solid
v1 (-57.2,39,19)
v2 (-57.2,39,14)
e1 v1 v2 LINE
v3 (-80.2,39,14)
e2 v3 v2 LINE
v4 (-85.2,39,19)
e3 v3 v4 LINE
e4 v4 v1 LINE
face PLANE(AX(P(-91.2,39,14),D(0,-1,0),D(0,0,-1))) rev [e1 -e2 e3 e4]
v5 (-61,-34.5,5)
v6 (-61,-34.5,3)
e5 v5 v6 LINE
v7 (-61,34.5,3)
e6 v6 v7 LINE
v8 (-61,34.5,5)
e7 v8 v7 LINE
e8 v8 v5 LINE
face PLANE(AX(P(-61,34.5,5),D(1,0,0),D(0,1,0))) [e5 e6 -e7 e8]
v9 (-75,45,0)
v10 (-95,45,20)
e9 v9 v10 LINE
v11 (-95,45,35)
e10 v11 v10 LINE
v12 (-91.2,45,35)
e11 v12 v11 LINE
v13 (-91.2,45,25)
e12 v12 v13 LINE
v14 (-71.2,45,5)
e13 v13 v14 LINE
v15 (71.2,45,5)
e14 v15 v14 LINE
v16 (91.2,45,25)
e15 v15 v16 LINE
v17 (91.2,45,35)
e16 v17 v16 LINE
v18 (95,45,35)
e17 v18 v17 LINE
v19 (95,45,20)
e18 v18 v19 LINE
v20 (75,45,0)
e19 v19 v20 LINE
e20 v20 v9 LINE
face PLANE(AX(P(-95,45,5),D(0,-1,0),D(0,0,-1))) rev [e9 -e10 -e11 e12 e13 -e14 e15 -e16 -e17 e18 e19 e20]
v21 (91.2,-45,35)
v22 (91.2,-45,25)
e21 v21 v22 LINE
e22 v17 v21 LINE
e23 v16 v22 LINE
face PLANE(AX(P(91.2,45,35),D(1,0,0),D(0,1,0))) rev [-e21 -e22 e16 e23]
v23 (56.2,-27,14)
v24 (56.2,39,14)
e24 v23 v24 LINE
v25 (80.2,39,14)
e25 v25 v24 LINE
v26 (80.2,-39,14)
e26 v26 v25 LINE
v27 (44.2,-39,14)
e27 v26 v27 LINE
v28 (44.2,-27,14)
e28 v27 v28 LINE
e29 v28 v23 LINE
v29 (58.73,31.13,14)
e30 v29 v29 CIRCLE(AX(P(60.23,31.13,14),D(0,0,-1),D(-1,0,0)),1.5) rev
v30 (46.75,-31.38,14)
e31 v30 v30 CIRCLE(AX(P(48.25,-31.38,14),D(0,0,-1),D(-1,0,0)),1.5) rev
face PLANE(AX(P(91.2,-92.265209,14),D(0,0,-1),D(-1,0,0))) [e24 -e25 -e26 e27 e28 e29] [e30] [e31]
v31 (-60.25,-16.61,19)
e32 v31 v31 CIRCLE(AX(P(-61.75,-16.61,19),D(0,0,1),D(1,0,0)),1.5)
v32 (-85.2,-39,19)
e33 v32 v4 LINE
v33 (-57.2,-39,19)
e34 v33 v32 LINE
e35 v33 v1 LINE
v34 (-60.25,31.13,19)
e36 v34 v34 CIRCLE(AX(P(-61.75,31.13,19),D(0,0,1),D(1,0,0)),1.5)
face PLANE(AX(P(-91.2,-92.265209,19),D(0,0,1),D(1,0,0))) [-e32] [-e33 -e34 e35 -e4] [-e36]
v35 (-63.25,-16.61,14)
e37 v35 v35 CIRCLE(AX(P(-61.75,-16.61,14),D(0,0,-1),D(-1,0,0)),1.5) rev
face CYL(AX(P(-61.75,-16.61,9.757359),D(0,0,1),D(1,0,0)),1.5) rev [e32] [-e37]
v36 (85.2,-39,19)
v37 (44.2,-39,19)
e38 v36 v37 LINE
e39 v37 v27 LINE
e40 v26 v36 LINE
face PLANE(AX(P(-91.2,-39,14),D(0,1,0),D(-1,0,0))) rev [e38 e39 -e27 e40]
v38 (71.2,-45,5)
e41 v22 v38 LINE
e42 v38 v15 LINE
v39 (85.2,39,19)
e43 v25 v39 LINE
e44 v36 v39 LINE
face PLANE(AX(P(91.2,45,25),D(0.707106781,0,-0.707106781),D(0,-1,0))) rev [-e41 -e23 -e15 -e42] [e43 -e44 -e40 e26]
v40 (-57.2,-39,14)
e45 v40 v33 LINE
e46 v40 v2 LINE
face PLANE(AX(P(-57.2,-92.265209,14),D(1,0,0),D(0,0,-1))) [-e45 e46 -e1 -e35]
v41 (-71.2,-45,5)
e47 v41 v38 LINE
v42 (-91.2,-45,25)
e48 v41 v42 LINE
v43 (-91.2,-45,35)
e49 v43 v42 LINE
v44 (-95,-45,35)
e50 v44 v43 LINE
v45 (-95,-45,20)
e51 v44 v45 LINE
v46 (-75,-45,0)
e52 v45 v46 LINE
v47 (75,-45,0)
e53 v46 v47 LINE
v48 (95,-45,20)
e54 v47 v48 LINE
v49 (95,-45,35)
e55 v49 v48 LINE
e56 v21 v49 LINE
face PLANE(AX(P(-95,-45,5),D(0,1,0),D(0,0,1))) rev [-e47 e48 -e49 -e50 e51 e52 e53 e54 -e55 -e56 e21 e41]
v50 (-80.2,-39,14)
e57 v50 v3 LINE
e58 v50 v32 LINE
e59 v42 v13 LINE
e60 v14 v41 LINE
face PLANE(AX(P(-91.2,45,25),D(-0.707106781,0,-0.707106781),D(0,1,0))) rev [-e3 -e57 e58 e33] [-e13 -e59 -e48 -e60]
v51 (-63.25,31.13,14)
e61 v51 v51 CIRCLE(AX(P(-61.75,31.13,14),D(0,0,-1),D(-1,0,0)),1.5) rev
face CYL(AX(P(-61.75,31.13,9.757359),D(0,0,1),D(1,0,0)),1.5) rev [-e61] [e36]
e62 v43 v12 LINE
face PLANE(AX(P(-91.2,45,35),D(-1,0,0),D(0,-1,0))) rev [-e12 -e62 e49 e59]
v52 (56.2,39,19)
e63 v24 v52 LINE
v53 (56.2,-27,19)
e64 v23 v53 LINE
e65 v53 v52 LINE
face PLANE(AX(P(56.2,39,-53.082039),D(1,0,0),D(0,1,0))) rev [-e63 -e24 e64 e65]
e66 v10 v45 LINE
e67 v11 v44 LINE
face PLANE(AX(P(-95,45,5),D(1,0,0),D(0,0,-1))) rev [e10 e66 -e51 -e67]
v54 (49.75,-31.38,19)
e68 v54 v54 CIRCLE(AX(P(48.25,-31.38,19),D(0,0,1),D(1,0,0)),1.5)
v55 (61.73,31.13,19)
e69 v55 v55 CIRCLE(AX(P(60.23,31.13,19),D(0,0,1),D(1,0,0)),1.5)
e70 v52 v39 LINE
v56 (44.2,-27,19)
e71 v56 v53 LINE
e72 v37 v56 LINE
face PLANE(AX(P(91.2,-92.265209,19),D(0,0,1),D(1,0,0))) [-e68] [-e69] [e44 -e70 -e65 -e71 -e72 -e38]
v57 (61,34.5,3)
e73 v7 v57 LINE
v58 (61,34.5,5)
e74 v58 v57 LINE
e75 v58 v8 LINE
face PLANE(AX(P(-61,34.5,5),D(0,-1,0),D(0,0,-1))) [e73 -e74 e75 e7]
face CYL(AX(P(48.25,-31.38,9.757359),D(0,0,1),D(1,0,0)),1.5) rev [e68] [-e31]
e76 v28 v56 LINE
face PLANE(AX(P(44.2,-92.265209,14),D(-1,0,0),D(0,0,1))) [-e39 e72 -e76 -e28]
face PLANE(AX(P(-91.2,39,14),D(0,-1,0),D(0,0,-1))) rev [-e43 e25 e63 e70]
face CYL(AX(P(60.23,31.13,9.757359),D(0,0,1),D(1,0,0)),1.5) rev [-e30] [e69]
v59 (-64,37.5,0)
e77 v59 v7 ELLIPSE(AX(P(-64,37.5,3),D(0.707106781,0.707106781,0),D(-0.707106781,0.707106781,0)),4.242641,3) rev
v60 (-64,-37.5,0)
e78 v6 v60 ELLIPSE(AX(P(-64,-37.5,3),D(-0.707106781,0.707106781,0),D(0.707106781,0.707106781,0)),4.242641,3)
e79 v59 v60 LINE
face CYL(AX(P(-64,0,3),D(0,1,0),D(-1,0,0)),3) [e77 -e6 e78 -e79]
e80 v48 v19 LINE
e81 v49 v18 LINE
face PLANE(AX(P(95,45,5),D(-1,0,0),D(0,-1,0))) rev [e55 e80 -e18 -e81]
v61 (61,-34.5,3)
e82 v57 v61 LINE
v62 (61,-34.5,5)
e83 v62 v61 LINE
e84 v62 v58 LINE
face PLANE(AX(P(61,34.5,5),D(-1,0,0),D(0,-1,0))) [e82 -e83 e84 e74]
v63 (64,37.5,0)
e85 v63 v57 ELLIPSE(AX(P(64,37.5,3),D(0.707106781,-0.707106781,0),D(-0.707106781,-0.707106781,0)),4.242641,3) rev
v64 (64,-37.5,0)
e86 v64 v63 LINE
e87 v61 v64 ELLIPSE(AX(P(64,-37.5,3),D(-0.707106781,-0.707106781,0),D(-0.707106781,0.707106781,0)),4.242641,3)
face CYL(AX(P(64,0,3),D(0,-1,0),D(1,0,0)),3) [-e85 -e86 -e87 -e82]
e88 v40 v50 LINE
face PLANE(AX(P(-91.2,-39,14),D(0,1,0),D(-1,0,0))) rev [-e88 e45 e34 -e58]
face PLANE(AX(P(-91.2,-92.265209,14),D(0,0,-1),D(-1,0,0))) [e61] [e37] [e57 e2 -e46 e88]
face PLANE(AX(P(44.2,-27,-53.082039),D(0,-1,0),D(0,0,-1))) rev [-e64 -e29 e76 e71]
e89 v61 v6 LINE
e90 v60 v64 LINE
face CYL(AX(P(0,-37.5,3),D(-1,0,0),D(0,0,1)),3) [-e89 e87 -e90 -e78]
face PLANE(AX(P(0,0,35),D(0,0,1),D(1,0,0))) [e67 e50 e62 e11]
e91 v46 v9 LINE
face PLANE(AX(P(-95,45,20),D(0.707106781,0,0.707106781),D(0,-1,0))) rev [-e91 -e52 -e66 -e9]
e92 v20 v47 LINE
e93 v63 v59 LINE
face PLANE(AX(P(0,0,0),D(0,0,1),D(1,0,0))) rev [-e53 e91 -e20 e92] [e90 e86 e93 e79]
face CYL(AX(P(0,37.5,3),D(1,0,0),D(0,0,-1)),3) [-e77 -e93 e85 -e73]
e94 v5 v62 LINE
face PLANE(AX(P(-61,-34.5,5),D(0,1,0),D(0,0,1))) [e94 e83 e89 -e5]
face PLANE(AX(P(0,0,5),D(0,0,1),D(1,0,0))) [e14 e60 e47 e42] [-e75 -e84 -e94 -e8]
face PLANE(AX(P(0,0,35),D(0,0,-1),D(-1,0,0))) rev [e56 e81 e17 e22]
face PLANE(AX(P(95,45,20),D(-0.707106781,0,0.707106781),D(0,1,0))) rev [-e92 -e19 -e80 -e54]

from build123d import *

# Parameters (mm, degrees)
SKETCH1_W           = 190
SKETCH1_H           = 90
SKETCH1_W_2         = 122
SKETCH1_H_2         = 69
BOSS_EXTRUDE1_DEPTH = 5
SKETCH2_W           = 3.8
SKETCH2_H           = 90
BOSS_EXTRUDE2_DEPTH = 30
SKETCH3_W           = 34
SKETCH3_H           = 5
SKETCH3_W_2         = 47
BOSS_EXTRUDE3_DEPTH = 90
SKETCH4_W           = 182.4
SKETCH4_H           = 6
CUT_EXTRUDE1_DEPTH  = 5
SKETCH5_R           = 1.5
CUT_EXTRUDE2_DEPTH  = 5
SKETCH6_W           = 12
SKETCH6_H           = 66
CUT_EXTRUDE3_DEPTH  = 5
FILLET3_R           = 3
CHAMFER6_SIZE       = 20


with BuildPart() as part:
    # Sketch1 → Boss-Extrude1 (new body)
    with BuildSketch(Plane.XY):
        Rectangle(SKETCH1_W, SKETCH1_H)
        Rectangle(SKETCH1_W_2, SKETCH1_H_2, mode=Mode.SUBTRACT)
    extrude(amount=BOSS_EXTRUDE1_DEPTH)

    # Sketch2 → Boss-Extrude2 (add)
    with BuildSketch(Plane.XY.offset(5)):
        with Locations((-93.1, 0)):
            Rectangle(SKETCH2_W, SKETCH2_H)
        with Locations((93.1, 0)):
            Rectangle(SKETCH2_W, SKETCH2_H)
    extrude(amount=BOSS_EXTRUDE2_DEPTH)

    # Sketch3 → Boss-Extrude3 (add)
    with BuildSketch(Plane(origin=(0, 45, 0), x_dir=(1, 0, 0), z_dir=(0, 1, 0))):
        with Locations((-74.2, -16.5)):
            Rectangle(SKETCH3_W, SKETCH3_H)
        with Locations((67.7, -16.5)):
            Rectangle(SKETCH3_W_2, SKETCH3_H)
    extrude(amount=-BOSS_EXTRUDE3_DEPTH)

    # Sketch4 → Cut-Extrude1 (cut)
    with BuildSketch(Plane.XY.offset(19)):
        with Locations((0, 42)):
            Rectangle(SKETCH4_W, SKETCH4_H)
        with Locations((0, -42)):
            Rectangle(SKETCH4_W, SKETCH4_H)
    extrude(amount=-CUT_EXTRUDE1_DEPTH, mode=Mode.SUBTRACT)

    # Sketch5 → Cut-Extrude2 (cut)
    with BuildSketch(Plane.XY.offset(19)):
        with Locations((-61.75, 31.13)):
            Circle(SKETCH5_R)
        with Locations((-61.75, -16.61)):
            Circle(SKETCH5_R)
        with Locations((60.23, 31.13)):
            Circle(SKETCH5_R)
        with Locations((48.25, -31.38)):
            Circle(SKETCH5_R)
    extrude(amount=-CUT_EXTRUDE2_DEPTH, mode=Mode.SUBTRACT)

    # Sketch6 → Cut-Extrude3 (cut)
    with BuildSketch(Plane.XY.offset(19)):
        with Locations((50.2, 6)):
            Rectangle(SKETCH6_W, SKETCH6_H)
    extrude(amount=-CUT_EXTRUDE3_DEPTH, mode=Mode.SUBTRACT)

    # Fillet3
    fillet3_edges = [part.edges().sort_by_distance(p)[0] for p in [
        (61, 0, 0),
        (0, 34.5, 0),
        (-61, 0, 0),
        (0, -34.5, 0),
    ]]
    fillet(fillet3_edges, radius=FILLET3_R)

    # Chamfer6
    # the kernel refuses this chamfer: 20 mm, written as the material it adds along each edge
    with BuildSketch(Plane(origin=(-91.2, 45, 5), x_dir=(-0.027495876610586317, 0, 0.9996219169112968), z_dir=(0, -1, 0))) as chamfer6_piece_1:
        Polygon((CHAMFER6_SIZE * 0.999621916911, -CHAMFER6_SIZE * 0.0274958766106), (-CHAMFER6_SIZE * 0.0274958766106, -CHAMFER6_SIZE * 0.999621916911), (0, 0), align=None)
    extrude(amount=90)
    with BuildSketch(Plane(origin=(91.2, -45, 5), x_dir=(-0.9996219169112968, 0, -0.02749587661058636), z_dir=(0, 1, 0))) as chamfer6_piece_2:
        Polygon((CHAMFER6_SIZE * 0.999621916911, CHAMFER6_SIZE * 0.0274958766106), (-CHAMFER6_SIZE * 0.0274958766106, CHAMFER6_SIZE * 0.999621916911), (0, 0), align=None)
    extrude(amount=90)
    # the kernel refuses this chamfer: 20 mm, written as the material it takes off along each edge
    with BuildSketch(Plane(origin=(-95, -96.433659759, 0), x_dir=(0.9996219169112968, 0, -0.027495876610586372), z_dir=(0, 1, 0)), Plane(origin=(95, 96.433659759, 0), x_dir=(-0.9996219169112968, 0, -0.027495876610586372), z_dir=(0, -1, 0))) as chamfer6_2_piece_1:
        Polygon((CHAMFER6_SIZE * 0.999621916911, -CHAMFER6_SIZE * 0.0274958766106), (-CHAMFER6_SIZE * 0.0274958766106, -CHAMFER6_SIZE * 0.999621916911), (0, 0), align=None)
    extrude(amount=192.867319519, mode=Mode.SUBTRACT)


solid = part.part
